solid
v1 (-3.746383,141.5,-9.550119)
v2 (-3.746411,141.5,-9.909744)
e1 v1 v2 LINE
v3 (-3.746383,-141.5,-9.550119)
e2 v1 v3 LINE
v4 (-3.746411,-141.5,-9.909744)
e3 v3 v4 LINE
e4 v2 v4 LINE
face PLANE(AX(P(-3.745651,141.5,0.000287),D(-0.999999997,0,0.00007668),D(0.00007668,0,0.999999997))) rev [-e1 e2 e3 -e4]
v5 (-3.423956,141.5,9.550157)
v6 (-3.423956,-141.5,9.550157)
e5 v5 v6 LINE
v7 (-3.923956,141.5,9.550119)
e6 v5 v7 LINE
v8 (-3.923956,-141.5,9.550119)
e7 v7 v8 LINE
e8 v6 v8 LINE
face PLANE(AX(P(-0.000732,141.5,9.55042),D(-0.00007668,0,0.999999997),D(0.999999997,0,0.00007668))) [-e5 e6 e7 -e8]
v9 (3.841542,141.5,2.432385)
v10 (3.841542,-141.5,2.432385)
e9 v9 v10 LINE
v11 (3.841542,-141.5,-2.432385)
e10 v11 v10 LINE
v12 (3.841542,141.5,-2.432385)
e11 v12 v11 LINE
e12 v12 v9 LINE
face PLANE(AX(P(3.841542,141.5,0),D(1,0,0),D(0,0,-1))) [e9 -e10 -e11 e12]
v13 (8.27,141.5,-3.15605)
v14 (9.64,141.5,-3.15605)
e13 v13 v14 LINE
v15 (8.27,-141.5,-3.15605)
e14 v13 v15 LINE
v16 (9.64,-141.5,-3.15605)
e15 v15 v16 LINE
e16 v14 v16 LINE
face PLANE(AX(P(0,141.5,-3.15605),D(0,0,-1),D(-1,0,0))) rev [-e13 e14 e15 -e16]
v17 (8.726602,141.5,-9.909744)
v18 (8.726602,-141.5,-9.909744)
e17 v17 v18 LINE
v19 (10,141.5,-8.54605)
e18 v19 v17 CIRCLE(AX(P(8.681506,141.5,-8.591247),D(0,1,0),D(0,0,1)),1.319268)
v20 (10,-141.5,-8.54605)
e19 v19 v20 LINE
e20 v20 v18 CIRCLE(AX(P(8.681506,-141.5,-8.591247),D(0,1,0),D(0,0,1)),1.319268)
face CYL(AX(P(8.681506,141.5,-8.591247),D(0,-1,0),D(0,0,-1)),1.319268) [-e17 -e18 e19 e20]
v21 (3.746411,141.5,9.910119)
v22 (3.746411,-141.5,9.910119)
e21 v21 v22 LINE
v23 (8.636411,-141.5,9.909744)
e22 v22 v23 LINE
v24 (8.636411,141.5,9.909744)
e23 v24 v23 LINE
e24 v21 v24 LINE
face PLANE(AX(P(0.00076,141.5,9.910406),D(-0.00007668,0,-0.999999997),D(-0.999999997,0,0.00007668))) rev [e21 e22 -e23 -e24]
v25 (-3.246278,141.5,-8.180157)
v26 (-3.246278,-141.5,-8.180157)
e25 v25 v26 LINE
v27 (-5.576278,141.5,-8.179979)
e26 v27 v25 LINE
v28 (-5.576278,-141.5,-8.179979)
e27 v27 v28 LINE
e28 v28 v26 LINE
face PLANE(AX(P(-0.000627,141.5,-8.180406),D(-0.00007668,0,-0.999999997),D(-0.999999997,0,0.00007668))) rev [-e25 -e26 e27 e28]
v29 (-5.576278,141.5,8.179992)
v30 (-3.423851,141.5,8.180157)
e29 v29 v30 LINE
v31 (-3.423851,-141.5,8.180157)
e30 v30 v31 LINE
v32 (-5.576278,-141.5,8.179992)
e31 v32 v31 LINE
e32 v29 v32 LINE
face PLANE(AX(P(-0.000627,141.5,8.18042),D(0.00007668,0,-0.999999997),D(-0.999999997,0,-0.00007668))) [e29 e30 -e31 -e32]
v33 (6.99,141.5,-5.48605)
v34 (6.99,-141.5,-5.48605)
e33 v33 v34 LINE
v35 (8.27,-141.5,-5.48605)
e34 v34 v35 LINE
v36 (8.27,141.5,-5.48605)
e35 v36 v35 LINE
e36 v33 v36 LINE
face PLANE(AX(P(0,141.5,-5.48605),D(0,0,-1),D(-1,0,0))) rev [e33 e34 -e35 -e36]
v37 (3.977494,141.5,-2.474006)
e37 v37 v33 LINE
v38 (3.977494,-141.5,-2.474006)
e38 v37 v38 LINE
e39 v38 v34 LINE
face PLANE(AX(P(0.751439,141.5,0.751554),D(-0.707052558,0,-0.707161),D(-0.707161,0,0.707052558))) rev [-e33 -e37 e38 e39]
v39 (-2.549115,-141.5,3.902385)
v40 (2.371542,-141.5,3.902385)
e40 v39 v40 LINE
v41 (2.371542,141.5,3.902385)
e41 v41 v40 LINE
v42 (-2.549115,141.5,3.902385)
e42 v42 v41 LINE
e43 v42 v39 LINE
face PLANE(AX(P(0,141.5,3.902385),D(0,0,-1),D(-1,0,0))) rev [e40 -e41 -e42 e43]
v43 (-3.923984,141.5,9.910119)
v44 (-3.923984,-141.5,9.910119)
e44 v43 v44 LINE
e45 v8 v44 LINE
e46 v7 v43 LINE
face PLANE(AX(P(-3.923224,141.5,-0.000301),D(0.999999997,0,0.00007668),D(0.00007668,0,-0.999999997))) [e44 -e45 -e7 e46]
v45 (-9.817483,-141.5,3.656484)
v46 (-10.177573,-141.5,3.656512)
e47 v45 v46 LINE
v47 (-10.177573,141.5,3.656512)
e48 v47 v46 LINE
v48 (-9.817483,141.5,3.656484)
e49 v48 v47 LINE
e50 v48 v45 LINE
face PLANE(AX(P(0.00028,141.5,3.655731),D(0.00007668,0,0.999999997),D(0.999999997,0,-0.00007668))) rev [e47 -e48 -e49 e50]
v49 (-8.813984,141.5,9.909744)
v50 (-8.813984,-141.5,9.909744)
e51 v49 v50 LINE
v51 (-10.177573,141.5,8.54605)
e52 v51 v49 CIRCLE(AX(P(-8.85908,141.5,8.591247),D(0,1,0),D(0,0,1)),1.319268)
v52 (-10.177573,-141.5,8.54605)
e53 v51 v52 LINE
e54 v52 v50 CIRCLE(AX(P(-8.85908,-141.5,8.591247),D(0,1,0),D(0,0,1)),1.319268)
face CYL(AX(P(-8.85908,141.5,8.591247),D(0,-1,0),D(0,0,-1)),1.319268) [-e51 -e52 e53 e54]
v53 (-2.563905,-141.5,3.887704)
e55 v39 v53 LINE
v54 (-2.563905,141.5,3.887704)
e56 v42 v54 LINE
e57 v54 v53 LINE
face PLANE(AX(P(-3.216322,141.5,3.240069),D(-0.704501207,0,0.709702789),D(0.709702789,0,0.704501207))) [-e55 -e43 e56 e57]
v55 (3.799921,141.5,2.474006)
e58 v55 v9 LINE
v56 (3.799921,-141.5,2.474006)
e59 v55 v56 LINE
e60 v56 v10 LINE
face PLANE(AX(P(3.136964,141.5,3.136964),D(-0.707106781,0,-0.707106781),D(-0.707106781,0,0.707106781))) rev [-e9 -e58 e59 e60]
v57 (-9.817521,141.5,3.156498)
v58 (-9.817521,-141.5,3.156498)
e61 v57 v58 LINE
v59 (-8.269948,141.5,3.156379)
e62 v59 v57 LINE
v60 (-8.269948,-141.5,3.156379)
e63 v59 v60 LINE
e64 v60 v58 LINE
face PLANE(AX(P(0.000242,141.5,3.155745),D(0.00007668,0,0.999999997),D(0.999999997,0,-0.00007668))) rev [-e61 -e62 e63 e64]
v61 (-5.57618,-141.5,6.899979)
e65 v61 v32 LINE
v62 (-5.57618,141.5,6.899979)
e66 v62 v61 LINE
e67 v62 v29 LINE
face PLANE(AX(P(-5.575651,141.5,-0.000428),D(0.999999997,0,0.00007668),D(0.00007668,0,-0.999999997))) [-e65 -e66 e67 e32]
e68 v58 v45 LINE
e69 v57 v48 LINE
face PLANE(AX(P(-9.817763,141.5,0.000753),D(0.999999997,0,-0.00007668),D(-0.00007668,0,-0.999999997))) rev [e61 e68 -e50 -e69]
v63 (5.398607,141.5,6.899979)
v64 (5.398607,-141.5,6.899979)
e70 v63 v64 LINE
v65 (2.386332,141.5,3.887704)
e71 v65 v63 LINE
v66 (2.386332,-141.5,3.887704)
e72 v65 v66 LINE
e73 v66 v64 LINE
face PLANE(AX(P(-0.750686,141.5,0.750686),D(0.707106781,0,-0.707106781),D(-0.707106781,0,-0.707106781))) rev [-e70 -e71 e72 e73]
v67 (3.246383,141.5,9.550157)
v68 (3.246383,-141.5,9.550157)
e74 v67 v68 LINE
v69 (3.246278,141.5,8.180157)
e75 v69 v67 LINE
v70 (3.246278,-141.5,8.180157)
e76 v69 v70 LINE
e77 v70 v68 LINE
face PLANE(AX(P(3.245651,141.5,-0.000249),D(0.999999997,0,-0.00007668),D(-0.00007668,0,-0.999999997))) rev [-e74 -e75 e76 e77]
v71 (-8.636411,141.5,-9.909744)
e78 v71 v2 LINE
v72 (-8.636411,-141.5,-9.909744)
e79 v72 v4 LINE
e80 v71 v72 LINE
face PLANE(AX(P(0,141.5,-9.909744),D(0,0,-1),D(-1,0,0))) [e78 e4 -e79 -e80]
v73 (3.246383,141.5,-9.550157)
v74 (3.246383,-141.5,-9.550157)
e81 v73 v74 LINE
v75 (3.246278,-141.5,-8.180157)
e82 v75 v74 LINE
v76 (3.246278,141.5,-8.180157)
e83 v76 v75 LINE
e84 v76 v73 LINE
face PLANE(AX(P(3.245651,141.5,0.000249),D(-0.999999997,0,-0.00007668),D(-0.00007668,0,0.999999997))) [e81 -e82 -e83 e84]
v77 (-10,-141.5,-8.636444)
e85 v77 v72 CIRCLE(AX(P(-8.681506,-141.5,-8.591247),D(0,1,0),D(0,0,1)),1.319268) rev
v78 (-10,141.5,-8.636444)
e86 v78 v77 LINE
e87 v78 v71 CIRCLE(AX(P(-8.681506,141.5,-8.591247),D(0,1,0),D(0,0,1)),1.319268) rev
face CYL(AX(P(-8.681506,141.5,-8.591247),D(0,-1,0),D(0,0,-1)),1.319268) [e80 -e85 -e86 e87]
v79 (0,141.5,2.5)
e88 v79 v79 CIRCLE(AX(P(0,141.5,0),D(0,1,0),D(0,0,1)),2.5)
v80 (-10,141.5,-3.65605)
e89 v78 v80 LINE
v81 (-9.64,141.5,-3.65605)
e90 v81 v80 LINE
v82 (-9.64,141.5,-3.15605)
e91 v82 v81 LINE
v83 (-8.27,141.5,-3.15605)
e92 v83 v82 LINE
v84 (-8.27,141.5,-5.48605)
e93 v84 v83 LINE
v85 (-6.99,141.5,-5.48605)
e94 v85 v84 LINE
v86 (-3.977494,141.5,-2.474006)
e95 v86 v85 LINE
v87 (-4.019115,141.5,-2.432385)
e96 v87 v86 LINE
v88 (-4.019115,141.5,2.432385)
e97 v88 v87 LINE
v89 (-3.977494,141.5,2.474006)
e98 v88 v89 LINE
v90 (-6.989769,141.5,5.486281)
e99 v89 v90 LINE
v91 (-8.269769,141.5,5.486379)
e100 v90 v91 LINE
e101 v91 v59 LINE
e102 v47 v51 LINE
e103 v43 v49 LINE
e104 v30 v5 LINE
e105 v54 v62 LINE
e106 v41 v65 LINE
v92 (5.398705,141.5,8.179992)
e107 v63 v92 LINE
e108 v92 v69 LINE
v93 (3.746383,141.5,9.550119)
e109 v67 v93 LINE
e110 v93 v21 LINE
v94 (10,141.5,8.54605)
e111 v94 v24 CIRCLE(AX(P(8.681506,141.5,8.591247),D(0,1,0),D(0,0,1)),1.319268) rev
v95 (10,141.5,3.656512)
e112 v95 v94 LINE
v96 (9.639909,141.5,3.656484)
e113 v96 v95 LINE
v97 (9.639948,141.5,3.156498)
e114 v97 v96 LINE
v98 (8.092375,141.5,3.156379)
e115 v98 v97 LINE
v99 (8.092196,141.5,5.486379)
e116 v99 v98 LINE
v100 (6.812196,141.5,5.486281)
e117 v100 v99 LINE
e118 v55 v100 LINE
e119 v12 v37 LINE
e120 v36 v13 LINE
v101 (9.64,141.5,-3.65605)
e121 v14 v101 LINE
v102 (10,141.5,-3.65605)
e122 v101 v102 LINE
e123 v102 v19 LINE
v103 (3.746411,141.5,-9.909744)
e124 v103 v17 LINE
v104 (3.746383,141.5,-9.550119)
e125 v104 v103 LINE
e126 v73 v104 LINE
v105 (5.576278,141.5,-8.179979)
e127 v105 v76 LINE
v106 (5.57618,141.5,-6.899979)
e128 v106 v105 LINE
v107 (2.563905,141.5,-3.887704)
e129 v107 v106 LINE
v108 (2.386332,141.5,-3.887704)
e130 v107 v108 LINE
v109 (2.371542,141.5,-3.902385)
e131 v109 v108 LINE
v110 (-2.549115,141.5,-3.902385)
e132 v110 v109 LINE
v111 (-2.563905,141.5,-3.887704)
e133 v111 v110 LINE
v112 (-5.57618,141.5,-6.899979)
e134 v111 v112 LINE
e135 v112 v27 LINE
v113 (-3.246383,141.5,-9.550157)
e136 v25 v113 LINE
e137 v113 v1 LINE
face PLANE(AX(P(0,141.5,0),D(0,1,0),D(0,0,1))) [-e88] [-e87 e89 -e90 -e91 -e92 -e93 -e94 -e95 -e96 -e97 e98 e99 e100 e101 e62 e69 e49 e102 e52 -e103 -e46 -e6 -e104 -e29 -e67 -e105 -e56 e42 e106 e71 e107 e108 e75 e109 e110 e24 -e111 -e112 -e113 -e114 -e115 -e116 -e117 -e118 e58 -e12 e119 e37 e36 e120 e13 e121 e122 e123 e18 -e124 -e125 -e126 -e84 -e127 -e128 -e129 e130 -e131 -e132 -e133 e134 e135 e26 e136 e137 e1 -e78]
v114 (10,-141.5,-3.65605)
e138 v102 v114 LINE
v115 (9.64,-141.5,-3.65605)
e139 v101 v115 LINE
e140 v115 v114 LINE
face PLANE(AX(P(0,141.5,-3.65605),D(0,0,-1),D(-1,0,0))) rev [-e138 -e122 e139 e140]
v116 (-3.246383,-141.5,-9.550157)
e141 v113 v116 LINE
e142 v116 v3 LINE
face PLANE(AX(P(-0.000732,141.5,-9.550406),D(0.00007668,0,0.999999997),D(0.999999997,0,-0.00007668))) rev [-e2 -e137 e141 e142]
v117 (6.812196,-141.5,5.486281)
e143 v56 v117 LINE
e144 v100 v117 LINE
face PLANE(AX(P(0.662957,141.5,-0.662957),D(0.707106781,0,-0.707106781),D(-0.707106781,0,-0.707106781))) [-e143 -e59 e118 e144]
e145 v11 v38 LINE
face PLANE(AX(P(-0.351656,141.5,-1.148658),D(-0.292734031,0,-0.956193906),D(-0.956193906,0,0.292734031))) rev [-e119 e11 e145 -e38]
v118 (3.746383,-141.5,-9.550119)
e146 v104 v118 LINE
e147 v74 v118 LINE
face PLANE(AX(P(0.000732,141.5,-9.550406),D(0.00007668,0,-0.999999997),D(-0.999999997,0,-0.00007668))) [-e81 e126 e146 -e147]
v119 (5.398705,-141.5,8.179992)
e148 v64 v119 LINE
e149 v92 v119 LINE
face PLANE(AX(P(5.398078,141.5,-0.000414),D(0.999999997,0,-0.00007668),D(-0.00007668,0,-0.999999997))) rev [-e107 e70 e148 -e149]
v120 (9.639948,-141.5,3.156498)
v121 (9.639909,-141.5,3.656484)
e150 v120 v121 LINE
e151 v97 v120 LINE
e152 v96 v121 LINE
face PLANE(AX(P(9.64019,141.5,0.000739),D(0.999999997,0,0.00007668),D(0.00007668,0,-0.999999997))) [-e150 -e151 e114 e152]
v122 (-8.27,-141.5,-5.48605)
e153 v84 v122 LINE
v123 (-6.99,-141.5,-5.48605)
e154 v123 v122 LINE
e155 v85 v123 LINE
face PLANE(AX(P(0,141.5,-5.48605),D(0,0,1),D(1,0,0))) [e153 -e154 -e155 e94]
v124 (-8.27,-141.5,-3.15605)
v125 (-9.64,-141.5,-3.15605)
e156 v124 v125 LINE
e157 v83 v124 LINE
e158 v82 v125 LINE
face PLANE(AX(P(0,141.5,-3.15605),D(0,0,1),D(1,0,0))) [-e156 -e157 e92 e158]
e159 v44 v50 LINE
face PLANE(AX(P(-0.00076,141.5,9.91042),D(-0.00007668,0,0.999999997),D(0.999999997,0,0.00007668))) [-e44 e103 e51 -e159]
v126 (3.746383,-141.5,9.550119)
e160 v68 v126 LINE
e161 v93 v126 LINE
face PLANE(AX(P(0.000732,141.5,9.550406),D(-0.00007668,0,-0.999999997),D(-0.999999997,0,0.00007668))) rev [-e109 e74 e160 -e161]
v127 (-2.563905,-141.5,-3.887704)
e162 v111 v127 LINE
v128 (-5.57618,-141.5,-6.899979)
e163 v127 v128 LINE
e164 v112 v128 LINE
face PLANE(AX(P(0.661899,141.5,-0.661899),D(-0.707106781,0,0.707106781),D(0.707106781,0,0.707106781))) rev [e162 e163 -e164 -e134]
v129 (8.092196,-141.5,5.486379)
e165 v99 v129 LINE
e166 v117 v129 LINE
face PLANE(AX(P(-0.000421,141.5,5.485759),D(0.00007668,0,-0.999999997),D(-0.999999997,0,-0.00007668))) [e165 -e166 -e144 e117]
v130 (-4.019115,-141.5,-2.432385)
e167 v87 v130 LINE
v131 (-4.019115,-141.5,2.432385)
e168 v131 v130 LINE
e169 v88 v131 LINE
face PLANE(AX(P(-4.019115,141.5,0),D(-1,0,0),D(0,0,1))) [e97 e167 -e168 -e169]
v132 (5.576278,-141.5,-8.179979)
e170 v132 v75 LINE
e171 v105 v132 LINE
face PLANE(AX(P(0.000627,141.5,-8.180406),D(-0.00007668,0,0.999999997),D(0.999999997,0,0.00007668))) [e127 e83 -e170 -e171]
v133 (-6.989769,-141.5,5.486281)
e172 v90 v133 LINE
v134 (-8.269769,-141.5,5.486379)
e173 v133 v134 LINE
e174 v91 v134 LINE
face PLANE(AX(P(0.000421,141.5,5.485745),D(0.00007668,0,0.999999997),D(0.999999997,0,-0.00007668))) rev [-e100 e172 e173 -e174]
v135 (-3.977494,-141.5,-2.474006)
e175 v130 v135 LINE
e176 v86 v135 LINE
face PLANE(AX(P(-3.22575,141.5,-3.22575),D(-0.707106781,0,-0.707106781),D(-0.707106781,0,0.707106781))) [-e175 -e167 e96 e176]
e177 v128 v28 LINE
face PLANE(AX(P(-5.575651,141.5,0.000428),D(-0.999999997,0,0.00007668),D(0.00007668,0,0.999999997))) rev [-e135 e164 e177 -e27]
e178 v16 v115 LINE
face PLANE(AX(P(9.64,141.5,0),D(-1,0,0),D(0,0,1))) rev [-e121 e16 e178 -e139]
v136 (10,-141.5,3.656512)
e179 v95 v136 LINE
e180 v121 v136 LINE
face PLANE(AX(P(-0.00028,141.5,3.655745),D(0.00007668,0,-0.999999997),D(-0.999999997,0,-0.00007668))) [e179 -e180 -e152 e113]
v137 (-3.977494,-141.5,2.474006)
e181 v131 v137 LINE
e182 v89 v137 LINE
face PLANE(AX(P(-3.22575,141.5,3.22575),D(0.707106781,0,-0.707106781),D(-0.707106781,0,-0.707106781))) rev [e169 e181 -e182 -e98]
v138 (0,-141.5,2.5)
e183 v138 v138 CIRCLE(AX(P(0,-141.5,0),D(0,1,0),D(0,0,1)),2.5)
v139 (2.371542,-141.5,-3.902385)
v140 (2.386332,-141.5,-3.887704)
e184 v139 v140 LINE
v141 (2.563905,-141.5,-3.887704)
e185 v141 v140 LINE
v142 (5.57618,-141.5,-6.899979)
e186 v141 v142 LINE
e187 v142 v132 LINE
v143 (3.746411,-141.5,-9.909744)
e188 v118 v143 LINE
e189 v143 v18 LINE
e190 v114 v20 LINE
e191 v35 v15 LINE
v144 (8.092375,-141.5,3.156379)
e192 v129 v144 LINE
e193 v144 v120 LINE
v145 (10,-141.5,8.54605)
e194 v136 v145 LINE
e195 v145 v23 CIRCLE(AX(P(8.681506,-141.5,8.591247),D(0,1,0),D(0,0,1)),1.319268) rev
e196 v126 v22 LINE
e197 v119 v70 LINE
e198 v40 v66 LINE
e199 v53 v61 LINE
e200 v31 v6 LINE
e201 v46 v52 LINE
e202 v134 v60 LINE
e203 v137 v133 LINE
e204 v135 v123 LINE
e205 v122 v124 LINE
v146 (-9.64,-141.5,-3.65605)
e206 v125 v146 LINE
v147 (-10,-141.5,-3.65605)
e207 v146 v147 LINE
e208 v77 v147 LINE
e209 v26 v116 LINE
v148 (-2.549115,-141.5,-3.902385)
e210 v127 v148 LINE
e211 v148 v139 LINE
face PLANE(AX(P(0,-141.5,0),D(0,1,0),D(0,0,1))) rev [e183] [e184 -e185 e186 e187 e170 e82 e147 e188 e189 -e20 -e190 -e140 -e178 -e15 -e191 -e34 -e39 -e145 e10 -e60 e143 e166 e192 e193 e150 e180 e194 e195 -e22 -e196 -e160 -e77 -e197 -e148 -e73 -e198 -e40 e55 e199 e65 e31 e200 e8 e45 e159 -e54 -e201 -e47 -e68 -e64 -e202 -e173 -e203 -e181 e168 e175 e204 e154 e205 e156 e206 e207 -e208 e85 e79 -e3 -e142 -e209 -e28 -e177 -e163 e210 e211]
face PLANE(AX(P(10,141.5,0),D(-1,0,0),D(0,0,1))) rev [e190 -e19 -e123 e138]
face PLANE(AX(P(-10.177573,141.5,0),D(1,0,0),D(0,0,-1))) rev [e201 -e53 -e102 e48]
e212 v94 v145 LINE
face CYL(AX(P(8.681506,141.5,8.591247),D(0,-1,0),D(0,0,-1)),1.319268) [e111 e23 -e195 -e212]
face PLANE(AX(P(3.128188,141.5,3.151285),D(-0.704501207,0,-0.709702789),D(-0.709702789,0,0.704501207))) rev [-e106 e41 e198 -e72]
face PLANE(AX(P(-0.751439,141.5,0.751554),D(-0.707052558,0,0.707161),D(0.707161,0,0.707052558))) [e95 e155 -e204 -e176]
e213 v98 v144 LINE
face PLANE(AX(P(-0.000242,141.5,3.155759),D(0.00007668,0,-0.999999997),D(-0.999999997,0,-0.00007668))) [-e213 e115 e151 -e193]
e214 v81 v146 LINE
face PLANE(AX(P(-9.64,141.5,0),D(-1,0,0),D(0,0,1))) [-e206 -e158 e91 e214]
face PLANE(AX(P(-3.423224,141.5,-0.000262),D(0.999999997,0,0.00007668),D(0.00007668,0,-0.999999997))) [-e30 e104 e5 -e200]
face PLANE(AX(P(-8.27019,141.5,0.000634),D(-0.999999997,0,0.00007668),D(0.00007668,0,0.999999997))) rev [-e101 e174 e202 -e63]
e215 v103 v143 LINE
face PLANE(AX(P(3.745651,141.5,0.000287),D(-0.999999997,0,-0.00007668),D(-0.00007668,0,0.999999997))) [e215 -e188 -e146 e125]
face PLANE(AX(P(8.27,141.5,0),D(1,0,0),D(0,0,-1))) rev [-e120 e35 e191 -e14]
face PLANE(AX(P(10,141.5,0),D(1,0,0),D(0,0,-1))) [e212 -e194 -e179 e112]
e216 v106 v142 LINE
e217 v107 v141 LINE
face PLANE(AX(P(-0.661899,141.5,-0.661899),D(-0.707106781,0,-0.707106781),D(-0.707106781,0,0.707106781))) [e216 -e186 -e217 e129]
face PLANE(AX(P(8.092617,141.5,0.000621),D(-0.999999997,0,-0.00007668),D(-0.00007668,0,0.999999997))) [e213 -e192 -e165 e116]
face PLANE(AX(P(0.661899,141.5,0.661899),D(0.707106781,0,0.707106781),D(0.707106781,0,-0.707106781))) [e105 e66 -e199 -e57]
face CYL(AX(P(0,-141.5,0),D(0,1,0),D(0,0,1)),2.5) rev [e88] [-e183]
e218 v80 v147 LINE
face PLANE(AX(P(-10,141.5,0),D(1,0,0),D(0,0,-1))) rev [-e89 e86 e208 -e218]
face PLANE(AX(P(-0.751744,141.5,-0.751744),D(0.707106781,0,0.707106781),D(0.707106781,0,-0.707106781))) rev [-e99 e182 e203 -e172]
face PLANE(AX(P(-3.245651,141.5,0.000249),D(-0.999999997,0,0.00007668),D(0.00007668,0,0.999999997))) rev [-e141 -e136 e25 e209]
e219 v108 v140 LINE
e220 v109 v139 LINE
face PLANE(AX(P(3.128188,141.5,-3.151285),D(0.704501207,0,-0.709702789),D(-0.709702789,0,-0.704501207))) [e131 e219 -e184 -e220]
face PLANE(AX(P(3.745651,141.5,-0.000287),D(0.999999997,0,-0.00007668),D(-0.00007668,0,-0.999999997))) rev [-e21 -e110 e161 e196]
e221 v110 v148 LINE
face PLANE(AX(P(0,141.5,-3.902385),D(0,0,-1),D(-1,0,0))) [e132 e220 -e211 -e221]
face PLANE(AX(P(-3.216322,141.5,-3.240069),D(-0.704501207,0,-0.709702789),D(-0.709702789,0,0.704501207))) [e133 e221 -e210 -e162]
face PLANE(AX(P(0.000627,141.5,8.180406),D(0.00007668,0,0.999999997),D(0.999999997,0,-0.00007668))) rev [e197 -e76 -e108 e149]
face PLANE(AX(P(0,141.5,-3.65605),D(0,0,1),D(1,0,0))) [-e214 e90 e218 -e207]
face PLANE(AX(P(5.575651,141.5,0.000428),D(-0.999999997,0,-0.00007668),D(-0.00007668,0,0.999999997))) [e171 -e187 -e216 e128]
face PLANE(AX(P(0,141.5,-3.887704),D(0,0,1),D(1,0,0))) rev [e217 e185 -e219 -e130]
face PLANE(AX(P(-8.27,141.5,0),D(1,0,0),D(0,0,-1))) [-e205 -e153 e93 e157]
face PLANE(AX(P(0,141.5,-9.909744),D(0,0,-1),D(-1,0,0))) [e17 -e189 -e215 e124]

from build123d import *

# Parameters (mm, degrees)
SALIENTE_EXTRUIR1_START = -141.5
SALIENTE_EXTRUIR1_DEPTH = 283
CROQUIS2_R              = 2.5
CORTAR_EXTRUIR1_DEPTH   = 284.356342905


# Read off the part's stored shape, not the designer's step: Saliente-Extruir1
with BuildPart() as part:
    # Saliente-Extruir1 outline → Saliente-Extruir1 (new body)
    with BuildSketch(Plane(origin=(0, 0, 0), x_dir=(1, 0, 0), z_dir=(0, 1, 0)).offset(SALIENTE_EXTRUIR1_START)):
        with BuildLine():
            ThreePointArc((8.636410676, -9.909743891), (9.614405544, -9.524074441), (10, -8.546050003))
            Line((10, -8.546050003), (10, -3.656511811))
            Line((10, -3.656511811), (9.639909344, -3.656484199))
            Line((9.639909344, -3.656484199), (9.639947683, -3.156497817))
            Line((9.639947683, -3.156497817), (8.092374533, -3.156379149))
            Line((8.092374533, -3.156379149), (8.092195869, -5.486379142))
            Line((8.092195869, -5.486379142), (6.812195872, -5.486280992))
            Line((6.812195872, -5.486280992), (3.799920985, -2.474006104))
            Line((3.799920985, -2.474006104), (3.841542046, -2.432385043))
            Line((3.841542046, -2.432385043), (3.841542046, 2.432385043))
            Line((3.841542046, 2.432385043), (3.97749414, 2.474006104))
            Line((3.97749414, 2.474006104), (6.99, 5.486050003))
            Line((6.99, 5.486050003), (8.27, 5.486050003))
            Line((8.27, 5.486050003), (8.27, 3.156050003))
            Line((8.27, 3.156050003), (9.64, 3.156050003))
            Line((9.64, 3.156050003), (9.64, 3.656050003))
            Line((9.64, 3.656050003), (10, 3.656050003))
            Line((10, 3.656050003), (10, 8.546050003))
            ThreePointArc((10, 8.546050003), (9.645746662, 9.491640567), (8.726602194, 9.909743891))
            Line((8.726602194, 9.909743891), (3.746410661, 9.909743891))
            Line((3.746410661, 9.909743891), (3.746383085, 9.550118856))
            Line((3.746383085, 9.550118856), (3.246383087, 9.550157196))
            Line((3.246383087, 9.550157196), (3.246278035, 8.1801572))
            Line((3.246278035, 8.1801572), (5.576278029, 8.179978536))
            Line((5.576278029, 8.179978536), (5.576179878, 6.89997854))
            Line((5.576179878, 6.89997854), (2.563904991, 3.887703652))
            Line((2.563904991, 3.887703652), (2.386331835, 3.887703652))
            Line((2.386331835, 3.887703652), (2.371542046, 3.902385043))
            Line((2.371542046, 3.902385043), (-2.549115201, 3.902385043))
            Line((-2.549115201, 3.902385043), (-2.563904991, 3.887703652))
            Line((-2.563904991, 3.887703652), (-5.576179878, 6.89997854))
            Line((-5.576179878, 6.89997854), (-5.576278029, 8.179978536))
            Line((-5.576278029, 8.179978536), (-3.246278035, 8.1801572))
            Line((-3.246278035, 8.1801572), (-3.246383087, 9.550157196))
            Line((-3.246383087, 9.550157196), (-3.746383085, 9.550118856))
            Line((-3.746383085, 9.550118856), (-3.746410661, 9.909743891))
            Line((-3.746410661, 9.909743891), (-8.636410676, 9.909743891))
            ThreePointArc((-8.636410676, 9.909743891), (-9.581900138, 9.555487091), (-10, 8.636443724))
            Line((-10, 8.636443724), (-10, 3.656050003))
            Line((-10, 3.656050003), (-9.64, 3.656050003))
            Line((-9.64, 3.656050003), (-9.64, 3.156050003))
            Line((-9.64, 3.156050003), (-8.27, 3.156050003))
            Line((-8.27, 3.156050003), (-8.27, 5.486050003))
            Line((-8.27, 5.486050003), (-6.99, 5.486050003))
            Line((-6.99, 5.486050003), (-3.97749414, 2.474006104))
            Line((-3.97749414, 2.474006104), (-4.019115201, 2.432385043))
            Line((-4.019115201, 2.432385043), (-4.019115201, -2.432385043))
            Line((-4.019115201, -2.432385043), (-3.97749414, -2.474006104))
            Line((-3.97749414, -2.474006104), (-6.989769028, -5.486280992))
            Line((-6.989769028, -5.486280992), (-8.269769024, -5.486379142))
            Line((-8.269769024, -5.486379142), (-8.269947688, -3.156379149))
            Line((-8.269947688, -3.156379149), (-9.817520839, -3.156497817))
            Line((-9.817520839, -3.156497817), (-9.8174825, -3.656484199))
            Line((-9.8174825, -3.656484199), (-10.177573156, -3.656511811))
            Line((-10.177573156, -3.656511811), (-10.177573156, -8.546050003))
            ThreePointArc((-10.177573156, -8.546050003), (-9.7919787, -9.524074441), (-8.813983831, -9.909743891))
            Line((-8.813983831, -9.909743891), (-3.923983846, -9.910118855))
            Line((-3.923983846, -9.910118855), (-3.923956241, -9.550118856))
            Line((-3.923956241, -9.550118856), (-3.423956243, -9.550157196))
            Line((-3.423956243, -9.550157196), (-3.423851191, -8.1801572))
            Line((-3.423851191, -8.1801572), (-5.57627803, -8.179992152))
            Line((-5.57627803, -8.179992152), (-5.576179878, -6.89997854))
            Line((-5.576179878, -6.89997854), (-2.563904991, -3.887703652))
            Line((-2.563904991, -3.887703652), (-2.549115201, -3.902385043))
            Line((-2.549115201, -3.902385043), (2.371542046, -3.902385043))
            Line((2.371542046, -3.902385043), (2.386331835, -3.887703652))
            Line((2.386331835, -3.887703652), (5.398606723, -6.89997854))
            Line((5.398606723, -6.89997854), (5.398704874, -8.179992152))
            Line((5.398704874, -8.179992152), (3.246278035, -8.1801572))
            Line((3.246278035, -8.1801572), (3.246383087, -9.550157196))
            Line((3.246383087, -9.550157196), (3.746383085, -9.550118856))
            Line((3.746383085, -9.550118856), (3.74641069, -9.910118855))
            Line((3.74641069, -9.910118855), (8.636410676, -9.909743891))
        make_face()
    extrude(amount=SALIENTE_EXTRUIR1_DEPTH)

    # Croquis2 → Cortar-Extruir1 (cut, through all)
    with BuildSketch(Plane(origin=(0, 141.5, 0), x_dir=(1, 0, 0), z_dir=(0, 1, 0))):
        with Locations(Location((0, 0, 0), (0, 0, 270))):
            Circle(CROQUIS2_R)
    extrude(amount=-CORTAR_EXTRUIR1_DEPTH, mode=Mode.SUBTRACT)


solid = part.part
